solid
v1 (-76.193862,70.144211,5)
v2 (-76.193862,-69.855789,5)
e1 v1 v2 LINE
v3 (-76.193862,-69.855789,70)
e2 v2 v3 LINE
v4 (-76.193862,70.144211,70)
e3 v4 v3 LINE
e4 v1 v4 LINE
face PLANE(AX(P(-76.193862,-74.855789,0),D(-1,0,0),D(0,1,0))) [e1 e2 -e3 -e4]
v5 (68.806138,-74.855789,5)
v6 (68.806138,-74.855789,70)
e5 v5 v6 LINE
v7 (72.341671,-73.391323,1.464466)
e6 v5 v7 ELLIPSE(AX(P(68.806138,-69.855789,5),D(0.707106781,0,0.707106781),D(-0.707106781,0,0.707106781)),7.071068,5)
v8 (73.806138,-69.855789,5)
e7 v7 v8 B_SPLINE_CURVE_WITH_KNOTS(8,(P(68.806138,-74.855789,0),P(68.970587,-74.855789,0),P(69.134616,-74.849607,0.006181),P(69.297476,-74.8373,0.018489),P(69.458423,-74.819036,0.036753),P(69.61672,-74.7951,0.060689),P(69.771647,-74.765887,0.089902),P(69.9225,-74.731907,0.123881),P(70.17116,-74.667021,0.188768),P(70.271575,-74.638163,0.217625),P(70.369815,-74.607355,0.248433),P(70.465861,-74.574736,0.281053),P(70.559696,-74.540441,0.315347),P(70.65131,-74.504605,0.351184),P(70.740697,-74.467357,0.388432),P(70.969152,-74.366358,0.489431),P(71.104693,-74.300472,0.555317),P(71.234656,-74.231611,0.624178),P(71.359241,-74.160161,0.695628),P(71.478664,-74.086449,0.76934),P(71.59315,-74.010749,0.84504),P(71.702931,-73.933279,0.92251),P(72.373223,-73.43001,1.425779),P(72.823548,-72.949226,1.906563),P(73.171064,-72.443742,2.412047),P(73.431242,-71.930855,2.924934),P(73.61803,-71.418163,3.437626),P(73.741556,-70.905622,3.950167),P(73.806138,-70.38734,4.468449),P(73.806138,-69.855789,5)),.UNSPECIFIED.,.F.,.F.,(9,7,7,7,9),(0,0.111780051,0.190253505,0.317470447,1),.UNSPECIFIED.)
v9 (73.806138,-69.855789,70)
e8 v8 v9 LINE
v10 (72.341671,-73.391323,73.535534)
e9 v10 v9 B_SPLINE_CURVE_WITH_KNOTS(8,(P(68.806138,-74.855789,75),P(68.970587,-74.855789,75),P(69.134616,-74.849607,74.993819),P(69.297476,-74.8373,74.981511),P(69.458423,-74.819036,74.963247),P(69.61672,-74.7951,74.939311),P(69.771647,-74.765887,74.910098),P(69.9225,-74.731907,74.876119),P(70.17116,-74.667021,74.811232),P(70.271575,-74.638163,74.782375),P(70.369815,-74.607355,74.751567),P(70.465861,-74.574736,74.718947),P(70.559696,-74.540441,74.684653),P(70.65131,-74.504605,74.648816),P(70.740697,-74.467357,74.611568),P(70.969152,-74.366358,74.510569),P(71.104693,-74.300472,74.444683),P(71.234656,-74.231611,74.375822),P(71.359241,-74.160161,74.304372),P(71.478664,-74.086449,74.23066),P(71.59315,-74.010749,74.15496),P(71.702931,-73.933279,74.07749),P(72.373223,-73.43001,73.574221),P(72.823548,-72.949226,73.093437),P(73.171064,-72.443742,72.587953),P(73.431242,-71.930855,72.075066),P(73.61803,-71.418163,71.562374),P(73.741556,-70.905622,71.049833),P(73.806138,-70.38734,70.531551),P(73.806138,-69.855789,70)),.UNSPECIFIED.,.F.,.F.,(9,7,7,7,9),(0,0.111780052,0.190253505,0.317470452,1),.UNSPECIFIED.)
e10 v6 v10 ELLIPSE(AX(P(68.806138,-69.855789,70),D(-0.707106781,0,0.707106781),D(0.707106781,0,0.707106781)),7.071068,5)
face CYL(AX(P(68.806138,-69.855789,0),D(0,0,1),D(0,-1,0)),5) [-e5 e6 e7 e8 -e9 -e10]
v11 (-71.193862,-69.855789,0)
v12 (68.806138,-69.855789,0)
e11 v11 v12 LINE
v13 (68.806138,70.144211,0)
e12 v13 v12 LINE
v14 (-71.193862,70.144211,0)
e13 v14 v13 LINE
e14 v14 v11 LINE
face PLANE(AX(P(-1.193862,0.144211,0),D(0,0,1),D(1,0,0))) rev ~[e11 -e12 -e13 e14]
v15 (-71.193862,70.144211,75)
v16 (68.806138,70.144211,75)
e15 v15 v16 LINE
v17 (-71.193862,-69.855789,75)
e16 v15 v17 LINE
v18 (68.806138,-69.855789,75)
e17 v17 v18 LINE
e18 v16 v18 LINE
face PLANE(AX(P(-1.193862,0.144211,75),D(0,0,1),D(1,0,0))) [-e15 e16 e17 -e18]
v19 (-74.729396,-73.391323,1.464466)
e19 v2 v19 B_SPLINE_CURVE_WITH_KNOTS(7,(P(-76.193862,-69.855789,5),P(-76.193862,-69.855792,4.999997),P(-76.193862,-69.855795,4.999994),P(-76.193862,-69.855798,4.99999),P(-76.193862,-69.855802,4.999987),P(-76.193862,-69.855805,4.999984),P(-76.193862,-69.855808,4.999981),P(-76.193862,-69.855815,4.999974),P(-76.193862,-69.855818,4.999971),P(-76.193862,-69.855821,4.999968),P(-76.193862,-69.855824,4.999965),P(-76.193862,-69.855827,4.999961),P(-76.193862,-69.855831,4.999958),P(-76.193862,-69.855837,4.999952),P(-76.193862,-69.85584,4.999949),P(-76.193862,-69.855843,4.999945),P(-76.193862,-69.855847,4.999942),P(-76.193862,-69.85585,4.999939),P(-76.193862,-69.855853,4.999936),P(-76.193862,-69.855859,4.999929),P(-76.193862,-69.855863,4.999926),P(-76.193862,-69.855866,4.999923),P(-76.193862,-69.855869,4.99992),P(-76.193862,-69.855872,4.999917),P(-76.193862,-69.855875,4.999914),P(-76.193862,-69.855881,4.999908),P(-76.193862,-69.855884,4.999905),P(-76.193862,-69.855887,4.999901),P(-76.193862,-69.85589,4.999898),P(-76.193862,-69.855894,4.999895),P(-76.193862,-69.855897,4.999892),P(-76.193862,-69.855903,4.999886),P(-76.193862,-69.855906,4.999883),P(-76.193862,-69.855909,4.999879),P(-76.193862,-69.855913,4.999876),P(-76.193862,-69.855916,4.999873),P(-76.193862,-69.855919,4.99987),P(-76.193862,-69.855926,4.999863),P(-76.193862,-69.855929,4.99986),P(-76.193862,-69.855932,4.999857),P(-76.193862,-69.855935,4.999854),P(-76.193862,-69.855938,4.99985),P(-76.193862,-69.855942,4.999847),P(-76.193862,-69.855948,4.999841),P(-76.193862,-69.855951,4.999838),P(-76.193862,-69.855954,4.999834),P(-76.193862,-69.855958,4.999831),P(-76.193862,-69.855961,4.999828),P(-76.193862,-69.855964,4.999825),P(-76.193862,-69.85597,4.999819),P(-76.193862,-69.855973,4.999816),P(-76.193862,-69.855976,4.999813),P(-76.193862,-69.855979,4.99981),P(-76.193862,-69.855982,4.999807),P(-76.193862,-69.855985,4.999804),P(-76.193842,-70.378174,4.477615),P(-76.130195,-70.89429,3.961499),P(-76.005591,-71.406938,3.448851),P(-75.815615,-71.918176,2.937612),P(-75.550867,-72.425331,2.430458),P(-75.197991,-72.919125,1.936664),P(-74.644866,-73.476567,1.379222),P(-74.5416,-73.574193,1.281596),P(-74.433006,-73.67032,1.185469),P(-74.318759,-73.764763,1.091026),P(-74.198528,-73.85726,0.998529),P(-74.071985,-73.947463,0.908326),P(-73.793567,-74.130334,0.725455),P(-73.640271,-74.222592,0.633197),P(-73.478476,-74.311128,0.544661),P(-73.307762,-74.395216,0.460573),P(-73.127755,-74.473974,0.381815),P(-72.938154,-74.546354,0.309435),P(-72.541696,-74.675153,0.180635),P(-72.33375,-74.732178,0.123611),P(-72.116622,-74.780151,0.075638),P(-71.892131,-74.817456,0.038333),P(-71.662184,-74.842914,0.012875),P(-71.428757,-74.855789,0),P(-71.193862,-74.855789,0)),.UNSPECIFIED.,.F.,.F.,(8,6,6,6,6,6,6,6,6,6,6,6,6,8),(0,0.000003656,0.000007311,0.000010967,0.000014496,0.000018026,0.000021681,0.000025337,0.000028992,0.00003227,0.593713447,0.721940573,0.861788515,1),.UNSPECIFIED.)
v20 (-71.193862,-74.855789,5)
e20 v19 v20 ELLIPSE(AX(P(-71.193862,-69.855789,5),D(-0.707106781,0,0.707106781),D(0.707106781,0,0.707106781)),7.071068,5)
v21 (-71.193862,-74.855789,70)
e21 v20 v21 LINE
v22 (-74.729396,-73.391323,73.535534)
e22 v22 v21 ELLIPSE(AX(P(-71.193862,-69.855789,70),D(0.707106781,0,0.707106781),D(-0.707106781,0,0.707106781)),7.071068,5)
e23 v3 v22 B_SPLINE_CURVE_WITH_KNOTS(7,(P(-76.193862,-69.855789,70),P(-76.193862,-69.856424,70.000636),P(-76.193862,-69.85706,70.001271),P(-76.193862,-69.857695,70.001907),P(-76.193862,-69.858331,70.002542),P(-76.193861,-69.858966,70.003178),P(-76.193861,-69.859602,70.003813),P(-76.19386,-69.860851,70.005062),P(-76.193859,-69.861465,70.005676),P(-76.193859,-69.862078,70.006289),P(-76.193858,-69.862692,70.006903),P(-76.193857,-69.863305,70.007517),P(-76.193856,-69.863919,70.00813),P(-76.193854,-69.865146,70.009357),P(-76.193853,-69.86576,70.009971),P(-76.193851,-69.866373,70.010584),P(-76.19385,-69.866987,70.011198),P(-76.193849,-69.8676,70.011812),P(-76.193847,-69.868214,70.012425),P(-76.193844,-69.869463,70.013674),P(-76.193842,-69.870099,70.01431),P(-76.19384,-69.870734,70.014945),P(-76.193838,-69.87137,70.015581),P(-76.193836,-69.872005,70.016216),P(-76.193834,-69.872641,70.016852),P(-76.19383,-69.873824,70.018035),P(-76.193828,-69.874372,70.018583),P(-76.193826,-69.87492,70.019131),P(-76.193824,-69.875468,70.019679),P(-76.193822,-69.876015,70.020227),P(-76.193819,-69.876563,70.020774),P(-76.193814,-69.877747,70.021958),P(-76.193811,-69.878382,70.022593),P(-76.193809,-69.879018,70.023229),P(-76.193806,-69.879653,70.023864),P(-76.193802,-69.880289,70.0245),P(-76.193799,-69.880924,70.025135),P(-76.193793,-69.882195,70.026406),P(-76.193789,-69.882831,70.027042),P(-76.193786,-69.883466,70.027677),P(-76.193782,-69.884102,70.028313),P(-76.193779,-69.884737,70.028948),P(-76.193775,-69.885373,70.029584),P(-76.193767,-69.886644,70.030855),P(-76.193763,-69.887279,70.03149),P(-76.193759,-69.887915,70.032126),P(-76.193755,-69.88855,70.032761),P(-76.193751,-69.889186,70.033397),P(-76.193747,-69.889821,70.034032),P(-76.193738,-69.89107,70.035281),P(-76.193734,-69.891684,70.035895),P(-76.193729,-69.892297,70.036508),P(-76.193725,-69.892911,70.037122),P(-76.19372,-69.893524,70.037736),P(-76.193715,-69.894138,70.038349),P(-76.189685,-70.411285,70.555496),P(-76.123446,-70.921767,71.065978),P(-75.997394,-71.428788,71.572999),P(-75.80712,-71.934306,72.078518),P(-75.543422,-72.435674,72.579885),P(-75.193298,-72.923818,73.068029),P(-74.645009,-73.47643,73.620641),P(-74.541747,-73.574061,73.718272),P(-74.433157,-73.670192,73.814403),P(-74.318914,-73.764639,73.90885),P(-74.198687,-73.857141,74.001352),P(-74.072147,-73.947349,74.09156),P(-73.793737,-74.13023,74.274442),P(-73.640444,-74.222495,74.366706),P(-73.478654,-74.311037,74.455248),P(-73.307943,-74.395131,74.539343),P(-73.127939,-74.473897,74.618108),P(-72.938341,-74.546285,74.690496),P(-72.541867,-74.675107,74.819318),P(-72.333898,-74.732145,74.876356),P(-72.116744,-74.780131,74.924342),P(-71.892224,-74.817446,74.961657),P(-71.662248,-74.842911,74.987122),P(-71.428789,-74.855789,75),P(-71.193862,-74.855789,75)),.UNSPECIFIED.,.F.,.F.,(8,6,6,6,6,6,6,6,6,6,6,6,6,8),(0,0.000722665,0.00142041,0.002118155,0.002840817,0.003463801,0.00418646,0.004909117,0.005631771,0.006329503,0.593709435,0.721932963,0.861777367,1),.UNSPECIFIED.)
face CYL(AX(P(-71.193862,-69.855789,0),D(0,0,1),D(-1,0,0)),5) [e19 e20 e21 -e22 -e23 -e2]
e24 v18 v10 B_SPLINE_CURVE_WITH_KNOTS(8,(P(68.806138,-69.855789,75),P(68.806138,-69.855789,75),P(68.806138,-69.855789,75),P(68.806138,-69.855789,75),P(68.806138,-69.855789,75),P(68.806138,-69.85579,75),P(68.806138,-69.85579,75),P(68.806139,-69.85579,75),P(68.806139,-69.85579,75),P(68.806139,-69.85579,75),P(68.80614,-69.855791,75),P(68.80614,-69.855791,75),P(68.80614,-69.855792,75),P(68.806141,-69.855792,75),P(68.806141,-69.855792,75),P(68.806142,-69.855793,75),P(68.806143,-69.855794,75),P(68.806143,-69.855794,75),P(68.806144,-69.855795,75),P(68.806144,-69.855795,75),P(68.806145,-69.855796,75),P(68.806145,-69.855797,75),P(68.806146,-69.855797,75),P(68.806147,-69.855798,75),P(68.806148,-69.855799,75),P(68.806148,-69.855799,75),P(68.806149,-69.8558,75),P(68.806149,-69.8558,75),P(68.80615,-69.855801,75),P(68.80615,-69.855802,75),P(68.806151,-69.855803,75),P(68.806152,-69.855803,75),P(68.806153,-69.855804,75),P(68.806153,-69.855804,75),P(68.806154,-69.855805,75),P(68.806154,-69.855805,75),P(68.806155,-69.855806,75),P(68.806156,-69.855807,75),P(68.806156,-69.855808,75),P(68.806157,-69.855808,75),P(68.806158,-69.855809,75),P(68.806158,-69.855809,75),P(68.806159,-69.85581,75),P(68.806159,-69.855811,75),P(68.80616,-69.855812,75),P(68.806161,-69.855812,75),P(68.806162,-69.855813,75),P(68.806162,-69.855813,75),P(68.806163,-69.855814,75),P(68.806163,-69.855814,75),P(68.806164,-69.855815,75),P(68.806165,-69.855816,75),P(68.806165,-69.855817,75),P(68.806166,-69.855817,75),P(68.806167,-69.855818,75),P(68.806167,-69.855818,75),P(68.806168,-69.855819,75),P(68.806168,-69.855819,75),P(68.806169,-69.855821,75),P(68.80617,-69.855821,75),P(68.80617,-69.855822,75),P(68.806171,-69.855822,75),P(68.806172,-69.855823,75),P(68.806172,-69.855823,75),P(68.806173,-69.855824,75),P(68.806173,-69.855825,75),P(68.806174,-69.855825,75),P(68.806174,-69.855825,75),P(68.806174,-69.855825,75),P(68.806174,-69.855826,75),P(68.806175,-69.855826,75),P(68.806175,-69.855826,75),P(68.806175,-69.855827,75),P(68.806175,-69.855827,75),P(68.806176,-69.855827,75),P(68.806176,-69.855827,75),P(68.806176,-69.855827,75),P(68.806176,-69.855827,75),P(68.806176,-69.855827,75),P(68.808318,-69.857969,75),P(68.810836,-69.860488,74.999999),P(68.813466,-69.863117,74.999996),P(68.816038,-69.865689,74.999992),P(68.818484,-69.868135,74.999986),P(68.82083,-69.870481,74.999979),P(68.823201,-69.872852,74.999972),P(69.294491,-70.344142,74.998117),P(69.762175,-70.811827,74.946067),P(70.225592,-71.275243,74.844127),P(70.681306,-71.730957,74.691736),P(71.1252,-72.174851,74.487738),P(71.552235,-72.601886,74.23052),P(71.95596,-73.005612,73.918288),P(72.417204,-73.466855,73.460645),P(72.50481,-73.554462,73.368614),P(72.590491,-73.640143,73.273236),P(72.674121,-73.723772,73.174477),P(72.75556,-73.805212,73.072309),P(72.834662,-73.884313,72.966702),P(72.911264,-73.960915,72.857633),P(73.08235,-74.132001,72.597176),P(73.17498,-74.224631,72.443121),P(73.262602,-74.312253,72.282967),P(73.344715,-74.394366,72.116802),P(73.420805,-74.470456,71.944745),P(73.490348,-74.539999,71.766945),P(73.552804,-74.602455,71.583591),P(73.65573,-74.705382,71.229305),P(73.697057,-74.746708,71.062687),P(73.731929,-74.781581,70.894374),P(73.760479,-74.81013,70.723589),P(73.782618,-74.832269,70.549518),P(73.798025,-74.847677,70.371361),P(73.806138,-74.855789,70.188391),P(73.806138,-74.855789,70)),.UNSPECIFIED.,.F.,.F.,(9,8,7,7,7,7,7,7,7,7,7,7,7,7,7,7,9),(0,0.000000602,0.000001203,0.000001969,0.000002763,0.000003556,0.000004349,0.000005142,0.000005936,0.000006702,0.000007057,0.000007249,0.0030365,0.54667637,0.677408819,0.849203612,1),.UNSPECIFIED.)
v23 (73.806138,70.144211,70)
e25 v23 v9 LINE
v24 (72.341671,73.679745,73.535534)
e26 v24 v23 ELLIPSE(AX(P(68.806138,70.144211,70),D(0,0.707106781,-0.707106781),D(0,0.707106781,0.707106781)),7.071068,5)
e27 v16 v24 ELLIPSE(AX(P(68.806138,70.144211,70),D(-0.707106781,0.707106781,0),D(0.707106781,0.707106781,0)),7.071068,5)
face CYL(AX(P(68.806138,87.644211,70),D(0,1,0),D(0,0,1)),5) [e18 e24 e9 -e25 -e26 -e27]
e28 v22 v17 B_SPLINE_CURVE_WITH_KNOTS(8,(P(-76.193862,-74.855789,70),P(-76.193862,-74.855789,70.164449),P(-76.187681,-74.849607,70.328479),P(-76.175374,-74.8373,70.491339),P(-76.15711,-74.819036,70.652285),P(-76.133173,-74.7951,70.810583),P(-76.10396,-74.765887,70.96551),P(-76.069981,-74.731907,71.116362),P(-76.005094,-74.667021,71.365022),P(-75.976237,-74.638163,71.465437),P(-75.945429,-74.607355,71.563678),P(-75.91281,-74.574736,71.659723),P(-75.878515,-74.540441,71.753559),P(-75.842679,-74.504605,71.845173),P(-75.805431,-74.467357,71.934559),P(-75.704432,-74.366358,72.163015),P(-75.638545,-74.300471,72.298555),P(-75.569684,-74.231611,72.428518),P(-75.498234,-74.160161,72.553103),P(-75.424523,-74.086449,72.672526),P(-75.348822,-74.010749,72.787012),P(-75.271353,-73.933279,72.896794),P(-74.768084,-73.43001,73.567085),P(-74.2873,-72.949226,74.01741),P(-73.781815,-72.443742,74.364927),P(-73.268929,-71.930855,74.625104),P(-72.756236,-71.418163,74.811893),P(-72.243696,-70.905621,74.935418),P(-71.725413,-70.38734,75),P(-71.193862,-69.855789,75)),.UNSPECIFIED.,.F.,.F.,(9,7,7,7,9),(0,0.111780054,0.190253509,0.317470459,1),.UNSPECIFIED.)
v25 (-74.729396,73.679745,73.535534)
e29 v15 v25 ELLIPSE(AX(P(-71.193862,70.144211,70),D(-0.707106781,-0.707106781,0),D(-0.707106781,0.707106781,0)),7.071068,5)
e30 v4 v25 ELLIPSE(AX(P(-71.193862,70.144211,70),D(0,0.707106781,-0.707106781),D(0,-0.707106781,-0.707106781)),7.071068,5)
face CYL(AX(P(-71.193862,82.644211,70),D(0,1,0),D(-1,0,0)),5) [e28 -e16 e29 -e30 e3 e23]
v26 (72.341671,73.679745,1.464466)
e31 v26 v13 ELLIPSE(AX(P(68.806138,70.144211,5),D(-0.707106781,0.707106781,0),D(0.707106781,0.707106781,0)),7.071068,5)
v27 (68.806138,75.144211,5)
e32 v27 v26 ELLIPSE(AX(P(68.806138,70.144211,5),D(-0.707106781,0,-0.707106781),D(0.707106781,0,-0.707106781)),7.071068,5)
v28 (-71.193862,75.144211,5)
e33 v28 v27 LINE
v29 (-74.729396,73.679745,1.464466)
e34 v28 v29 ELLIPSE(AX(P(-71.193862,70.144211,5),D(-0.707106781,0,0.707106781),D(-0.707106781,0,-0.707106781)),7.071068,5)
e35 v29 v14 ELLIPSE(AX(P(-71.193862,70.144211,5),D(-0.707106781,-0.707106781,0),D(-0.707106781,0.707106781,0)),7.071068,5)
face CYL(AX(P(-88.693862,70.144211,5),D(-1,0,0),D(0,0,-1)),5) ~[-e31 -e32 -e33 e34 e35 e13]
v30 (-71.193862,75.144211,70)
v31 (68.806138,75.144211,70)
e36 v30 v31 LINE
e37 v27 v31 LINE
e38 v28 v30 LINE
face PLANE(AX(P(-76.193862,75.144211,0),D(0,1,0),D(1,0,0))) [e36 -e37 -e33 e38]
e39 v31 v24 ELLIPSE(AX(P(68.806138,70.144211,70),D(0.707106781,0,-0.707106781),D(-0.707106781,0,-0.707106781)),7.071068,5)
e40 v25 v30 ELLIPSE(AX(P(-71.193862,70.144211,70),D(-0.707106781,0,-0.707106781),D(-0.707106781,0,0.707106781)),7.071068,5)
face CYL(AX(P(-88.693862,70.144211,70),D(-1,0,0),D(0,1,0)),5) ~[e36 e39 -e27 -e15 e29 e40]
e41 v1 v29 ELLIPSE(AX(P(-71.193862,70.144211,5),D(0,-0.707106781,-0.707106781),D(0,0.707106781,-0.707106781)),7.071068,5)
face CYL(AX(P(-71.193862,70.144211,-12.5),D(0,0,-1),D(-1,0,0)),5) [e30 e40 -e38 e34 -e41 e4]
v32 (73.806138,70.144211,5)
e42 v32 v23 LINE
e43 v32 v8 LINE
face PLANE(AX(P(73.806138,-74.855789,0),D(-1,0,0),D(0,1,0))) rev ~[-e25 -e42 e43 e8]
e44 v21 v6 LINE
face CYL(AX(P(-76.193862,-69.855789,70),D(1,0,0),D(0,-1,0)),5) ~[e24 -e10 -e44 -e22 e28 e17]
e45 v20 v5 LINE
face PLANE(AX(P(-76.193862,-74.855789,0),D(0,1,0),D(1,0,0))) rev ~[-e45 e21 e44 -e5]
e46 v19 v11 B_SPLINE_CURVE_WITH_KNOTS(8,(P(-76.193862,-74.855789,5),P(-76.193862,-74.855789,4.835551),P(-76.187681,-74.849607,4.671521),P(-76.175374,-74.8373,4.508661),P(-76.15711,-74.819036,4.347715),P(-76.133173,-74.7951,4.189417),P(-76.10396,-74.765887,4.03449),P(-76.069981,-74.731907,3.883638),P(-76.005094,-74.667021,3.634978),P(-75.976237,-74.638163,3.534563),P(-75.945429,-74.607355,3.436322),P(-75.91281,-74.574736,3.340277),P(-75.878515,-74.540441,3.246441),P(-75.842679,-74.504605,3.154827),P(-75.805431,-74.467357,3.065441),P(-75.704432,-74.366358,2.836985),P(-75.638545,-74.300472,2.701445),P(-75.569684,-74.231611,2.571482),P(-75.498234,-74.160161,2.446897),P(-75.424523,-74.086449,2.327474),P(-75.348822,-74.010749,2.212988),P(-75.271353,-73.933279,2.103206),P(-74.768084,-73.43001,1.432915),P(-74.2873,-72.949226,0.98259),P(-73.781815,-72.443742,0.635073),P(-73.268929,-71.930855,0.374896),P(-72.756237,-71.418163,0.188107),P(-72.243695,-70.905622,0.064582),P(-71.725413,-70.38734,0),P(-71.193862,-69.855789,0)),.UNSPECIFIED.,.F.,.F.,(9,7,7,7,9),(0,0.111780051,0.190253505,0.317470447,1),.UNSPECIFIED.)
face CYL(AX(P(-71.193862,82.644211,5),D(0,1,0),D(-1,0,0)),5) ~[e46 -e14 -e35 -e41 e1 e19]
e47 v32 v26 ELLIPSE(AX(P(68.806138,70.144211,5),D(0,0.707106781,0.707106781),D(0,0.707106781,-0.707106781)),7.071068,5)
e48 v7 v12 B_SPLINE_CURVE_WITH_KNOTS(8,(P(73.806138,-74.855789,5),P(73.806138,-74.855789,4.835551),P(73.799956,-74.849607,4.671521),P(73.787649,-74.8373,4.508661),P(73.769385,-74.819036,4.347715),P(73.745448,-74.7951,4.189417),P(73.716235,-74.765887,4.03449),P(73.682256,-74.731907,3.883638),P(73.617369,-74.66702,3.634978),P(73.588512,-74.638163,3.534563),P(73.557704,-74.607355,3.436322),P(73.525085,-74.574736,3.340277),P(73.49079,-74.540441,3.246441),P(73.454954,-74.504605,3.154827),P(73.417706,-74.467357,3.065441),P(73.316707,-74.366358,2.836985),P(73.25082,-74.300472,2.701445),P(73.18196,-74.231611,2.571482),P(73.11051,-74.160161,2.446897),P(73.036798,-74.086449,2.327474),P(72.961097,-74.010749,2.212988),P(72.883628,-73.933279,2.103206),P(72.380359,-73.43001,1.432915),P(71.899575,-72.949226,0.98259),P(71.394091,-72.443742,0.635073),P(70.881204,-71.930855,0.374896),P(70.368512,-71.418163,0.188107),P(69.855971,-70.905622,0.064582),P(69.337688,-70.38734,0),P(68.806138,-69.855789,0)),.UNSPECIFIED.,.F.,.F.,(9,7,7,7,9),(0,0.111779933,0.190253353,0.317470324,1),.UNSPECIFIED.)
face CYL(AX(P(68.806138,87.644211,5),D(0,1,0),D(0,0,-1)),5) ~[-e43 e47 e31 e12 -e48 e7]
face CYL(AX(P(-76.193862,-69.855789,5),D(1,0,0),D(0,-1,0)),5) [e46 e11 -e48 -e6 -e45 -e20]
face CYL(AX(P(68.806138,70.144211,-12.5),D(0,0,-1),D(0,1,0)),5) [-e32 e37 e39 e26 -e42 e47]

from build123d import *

# Parameters (mm, degrees)
F0_W        = 150
F0_H        = 150
F1_DEPTH    = 75
F2_R        = 5
F3_T1_DEPTH = 170
F3_T3_DEPTH = 100
F4_T1_DEPTH = 170
F4_T3_DEPTH = 100
F5_T1_DEPTH = 165


# Not quite as in the source:
# - a fillet or chamfer that OpenCascade refuses, or shapes differently, is made with other operations: its cross-section is extruded or revolved along the edge and cut away or added


with BuildPart() as f1:
    # F0 (on Top) → F1 (new body)
    with BuildSketch(Plane.XY):
        with Locations((-1.1938624084, 0.1442111853)):
            Rectangle(F0_W, F0_H)
    extrude(amount=F1_DEPTH)

    # F2
    f2_edges = [f1.edges().sort_by_distance(p)[0] for p in [
        (-76.193862, -74.855789, 37.5),
        (73.806138, -74.855789, 37.5),
        (-1.193862, -74.855789, 0),
        (-1.193862, -74.855789, 75),
    ]]
    fillet(f2_edges, radius=F2_R)

    # F3: fillet of radius 5 on 4 edges, made by hand

    # F3_s2 → F3_t1 (cut)
    with BuildSketch(Plane.XZ.offset(-87.6442111853)):
        with BuildLine():
            ThreePointArc((68.8061375916, 0), (72.3416714975, 1.4644660941), (73.8061375916, 5))
            Line((73.8061375916, 5), (73.8061375916, 0))
            Line((73.8061375916, 0), (68.8061375916, 0))
        make_face()
        with BuildLine():
            ThreePointArc((68.8061375916, 75), (72.3416714975, 73.5355339059), (73.8061375916, 70))
            Line((73.8061375916, 70), (73.8061375916, 75))
            Line((73.8061375916, 75), (68.8061375916, 75))
        make_face()
    extrude(amount=F3_T1_DEPTH, mode=Mode.SUBTRACT)

    # F3_s4 → F3_t3 (cut)
    with BuildSketch(Plane.XY.offset(-12.5)):
        with BuildLine():
            ThreePointArc((68.8061375916, 75.1442111853), (72.3416714975, 73.6797450912), (73.8061375916, 70.1442111853))
            Line((73.8061375916, 70.1442111853), (73.8061375916, 75.1442111853))
            Line((73.8061375916, 75.1442111853), (68.8061375916, 75.1442111853))
        make_face()
    extrude(amount=F3_T3_DEPTH, mode=Mode.SUBTRACT)

    # F4: fillet of radius 5 on 4 edges, made by hand

    # F4_s2 → F4_t1 (cut)
    with BuildSketch(Plane.YZ.offset(-88.6938624084)):
        with BuildLine():
            ThreePointArc((70.1442111853, 0), (73.6797450912, 1.4644660941), (75.1442111853, 5))
            Line((75.1442111853, 5), (75.1442111853, 0))
            Line((75.1442111853, 0), (70.1442111853, 0))
        make_face()
        with BuildLine():
            ThreePointArc((75.1442111853, 70), (73.6797450912, 73.5355339059), (70.1442111853, 75))
            Line((70.1442111853, 75), (75.1442111853, 75))
            Line((75.1442111853, 75), (75.1442111853, 70))
        make_face()
    extrude(amount=F4_T1_DEPTH, mode=Mode.SUBTRACT)

    # F4_s4 → F4_t3 (cut)
    with BuildSketch(Plane.XY.offset(-12.5)):
        with BuildLine():
            ThreePointArc((-76.1938624084, 70.1442111853), (-74.7293963143, 73.6797450912), (-71.1938624084, 75.1442111853))
            Line((-71.1938624084, 75.1442111853), (-76.1938624084, 75.1442111853))
            Line((-76.1938624084, 75.1442111853), (-76.1938624084, 70.1442111853))
        make_face()
    extrude(amount=F4_T3_DEPTH, mode=Mode.SUBTRACT)

    # F5: fillet of radius 5 on 4 edges, made by hand

    # F5_s2 → F5_t1 (cut)
    with BuildSketch(Plane.XZ.offset(-82.6442111853)):
        with BuildLine():
            ThreePointArc((-76.1938624084, 5), (-74.7293963143, 1.4644660941), (-71.1938624084, 0))
            Line((-71.1938624084, 0), (-76.1938624084, 0))
            Line((-76.1938624084, 0), (-76.1938624084, 5))
        make_face()
        with BuildLine():
            ThreePointArc((-76.1938624084, 70), (-74.7293963143, 73.5355339059), (-71.1938624084, 75))
            Line((-71.1938624084, 75), (-76.1938624084, 75))
            Line((-76.1938624084, 75), (-76.1938624084, 70))
        make_face()
    extrude(amount=F5_T1_DEPTH, mode=Mode.SUBTRACT)


solid = f1.part
